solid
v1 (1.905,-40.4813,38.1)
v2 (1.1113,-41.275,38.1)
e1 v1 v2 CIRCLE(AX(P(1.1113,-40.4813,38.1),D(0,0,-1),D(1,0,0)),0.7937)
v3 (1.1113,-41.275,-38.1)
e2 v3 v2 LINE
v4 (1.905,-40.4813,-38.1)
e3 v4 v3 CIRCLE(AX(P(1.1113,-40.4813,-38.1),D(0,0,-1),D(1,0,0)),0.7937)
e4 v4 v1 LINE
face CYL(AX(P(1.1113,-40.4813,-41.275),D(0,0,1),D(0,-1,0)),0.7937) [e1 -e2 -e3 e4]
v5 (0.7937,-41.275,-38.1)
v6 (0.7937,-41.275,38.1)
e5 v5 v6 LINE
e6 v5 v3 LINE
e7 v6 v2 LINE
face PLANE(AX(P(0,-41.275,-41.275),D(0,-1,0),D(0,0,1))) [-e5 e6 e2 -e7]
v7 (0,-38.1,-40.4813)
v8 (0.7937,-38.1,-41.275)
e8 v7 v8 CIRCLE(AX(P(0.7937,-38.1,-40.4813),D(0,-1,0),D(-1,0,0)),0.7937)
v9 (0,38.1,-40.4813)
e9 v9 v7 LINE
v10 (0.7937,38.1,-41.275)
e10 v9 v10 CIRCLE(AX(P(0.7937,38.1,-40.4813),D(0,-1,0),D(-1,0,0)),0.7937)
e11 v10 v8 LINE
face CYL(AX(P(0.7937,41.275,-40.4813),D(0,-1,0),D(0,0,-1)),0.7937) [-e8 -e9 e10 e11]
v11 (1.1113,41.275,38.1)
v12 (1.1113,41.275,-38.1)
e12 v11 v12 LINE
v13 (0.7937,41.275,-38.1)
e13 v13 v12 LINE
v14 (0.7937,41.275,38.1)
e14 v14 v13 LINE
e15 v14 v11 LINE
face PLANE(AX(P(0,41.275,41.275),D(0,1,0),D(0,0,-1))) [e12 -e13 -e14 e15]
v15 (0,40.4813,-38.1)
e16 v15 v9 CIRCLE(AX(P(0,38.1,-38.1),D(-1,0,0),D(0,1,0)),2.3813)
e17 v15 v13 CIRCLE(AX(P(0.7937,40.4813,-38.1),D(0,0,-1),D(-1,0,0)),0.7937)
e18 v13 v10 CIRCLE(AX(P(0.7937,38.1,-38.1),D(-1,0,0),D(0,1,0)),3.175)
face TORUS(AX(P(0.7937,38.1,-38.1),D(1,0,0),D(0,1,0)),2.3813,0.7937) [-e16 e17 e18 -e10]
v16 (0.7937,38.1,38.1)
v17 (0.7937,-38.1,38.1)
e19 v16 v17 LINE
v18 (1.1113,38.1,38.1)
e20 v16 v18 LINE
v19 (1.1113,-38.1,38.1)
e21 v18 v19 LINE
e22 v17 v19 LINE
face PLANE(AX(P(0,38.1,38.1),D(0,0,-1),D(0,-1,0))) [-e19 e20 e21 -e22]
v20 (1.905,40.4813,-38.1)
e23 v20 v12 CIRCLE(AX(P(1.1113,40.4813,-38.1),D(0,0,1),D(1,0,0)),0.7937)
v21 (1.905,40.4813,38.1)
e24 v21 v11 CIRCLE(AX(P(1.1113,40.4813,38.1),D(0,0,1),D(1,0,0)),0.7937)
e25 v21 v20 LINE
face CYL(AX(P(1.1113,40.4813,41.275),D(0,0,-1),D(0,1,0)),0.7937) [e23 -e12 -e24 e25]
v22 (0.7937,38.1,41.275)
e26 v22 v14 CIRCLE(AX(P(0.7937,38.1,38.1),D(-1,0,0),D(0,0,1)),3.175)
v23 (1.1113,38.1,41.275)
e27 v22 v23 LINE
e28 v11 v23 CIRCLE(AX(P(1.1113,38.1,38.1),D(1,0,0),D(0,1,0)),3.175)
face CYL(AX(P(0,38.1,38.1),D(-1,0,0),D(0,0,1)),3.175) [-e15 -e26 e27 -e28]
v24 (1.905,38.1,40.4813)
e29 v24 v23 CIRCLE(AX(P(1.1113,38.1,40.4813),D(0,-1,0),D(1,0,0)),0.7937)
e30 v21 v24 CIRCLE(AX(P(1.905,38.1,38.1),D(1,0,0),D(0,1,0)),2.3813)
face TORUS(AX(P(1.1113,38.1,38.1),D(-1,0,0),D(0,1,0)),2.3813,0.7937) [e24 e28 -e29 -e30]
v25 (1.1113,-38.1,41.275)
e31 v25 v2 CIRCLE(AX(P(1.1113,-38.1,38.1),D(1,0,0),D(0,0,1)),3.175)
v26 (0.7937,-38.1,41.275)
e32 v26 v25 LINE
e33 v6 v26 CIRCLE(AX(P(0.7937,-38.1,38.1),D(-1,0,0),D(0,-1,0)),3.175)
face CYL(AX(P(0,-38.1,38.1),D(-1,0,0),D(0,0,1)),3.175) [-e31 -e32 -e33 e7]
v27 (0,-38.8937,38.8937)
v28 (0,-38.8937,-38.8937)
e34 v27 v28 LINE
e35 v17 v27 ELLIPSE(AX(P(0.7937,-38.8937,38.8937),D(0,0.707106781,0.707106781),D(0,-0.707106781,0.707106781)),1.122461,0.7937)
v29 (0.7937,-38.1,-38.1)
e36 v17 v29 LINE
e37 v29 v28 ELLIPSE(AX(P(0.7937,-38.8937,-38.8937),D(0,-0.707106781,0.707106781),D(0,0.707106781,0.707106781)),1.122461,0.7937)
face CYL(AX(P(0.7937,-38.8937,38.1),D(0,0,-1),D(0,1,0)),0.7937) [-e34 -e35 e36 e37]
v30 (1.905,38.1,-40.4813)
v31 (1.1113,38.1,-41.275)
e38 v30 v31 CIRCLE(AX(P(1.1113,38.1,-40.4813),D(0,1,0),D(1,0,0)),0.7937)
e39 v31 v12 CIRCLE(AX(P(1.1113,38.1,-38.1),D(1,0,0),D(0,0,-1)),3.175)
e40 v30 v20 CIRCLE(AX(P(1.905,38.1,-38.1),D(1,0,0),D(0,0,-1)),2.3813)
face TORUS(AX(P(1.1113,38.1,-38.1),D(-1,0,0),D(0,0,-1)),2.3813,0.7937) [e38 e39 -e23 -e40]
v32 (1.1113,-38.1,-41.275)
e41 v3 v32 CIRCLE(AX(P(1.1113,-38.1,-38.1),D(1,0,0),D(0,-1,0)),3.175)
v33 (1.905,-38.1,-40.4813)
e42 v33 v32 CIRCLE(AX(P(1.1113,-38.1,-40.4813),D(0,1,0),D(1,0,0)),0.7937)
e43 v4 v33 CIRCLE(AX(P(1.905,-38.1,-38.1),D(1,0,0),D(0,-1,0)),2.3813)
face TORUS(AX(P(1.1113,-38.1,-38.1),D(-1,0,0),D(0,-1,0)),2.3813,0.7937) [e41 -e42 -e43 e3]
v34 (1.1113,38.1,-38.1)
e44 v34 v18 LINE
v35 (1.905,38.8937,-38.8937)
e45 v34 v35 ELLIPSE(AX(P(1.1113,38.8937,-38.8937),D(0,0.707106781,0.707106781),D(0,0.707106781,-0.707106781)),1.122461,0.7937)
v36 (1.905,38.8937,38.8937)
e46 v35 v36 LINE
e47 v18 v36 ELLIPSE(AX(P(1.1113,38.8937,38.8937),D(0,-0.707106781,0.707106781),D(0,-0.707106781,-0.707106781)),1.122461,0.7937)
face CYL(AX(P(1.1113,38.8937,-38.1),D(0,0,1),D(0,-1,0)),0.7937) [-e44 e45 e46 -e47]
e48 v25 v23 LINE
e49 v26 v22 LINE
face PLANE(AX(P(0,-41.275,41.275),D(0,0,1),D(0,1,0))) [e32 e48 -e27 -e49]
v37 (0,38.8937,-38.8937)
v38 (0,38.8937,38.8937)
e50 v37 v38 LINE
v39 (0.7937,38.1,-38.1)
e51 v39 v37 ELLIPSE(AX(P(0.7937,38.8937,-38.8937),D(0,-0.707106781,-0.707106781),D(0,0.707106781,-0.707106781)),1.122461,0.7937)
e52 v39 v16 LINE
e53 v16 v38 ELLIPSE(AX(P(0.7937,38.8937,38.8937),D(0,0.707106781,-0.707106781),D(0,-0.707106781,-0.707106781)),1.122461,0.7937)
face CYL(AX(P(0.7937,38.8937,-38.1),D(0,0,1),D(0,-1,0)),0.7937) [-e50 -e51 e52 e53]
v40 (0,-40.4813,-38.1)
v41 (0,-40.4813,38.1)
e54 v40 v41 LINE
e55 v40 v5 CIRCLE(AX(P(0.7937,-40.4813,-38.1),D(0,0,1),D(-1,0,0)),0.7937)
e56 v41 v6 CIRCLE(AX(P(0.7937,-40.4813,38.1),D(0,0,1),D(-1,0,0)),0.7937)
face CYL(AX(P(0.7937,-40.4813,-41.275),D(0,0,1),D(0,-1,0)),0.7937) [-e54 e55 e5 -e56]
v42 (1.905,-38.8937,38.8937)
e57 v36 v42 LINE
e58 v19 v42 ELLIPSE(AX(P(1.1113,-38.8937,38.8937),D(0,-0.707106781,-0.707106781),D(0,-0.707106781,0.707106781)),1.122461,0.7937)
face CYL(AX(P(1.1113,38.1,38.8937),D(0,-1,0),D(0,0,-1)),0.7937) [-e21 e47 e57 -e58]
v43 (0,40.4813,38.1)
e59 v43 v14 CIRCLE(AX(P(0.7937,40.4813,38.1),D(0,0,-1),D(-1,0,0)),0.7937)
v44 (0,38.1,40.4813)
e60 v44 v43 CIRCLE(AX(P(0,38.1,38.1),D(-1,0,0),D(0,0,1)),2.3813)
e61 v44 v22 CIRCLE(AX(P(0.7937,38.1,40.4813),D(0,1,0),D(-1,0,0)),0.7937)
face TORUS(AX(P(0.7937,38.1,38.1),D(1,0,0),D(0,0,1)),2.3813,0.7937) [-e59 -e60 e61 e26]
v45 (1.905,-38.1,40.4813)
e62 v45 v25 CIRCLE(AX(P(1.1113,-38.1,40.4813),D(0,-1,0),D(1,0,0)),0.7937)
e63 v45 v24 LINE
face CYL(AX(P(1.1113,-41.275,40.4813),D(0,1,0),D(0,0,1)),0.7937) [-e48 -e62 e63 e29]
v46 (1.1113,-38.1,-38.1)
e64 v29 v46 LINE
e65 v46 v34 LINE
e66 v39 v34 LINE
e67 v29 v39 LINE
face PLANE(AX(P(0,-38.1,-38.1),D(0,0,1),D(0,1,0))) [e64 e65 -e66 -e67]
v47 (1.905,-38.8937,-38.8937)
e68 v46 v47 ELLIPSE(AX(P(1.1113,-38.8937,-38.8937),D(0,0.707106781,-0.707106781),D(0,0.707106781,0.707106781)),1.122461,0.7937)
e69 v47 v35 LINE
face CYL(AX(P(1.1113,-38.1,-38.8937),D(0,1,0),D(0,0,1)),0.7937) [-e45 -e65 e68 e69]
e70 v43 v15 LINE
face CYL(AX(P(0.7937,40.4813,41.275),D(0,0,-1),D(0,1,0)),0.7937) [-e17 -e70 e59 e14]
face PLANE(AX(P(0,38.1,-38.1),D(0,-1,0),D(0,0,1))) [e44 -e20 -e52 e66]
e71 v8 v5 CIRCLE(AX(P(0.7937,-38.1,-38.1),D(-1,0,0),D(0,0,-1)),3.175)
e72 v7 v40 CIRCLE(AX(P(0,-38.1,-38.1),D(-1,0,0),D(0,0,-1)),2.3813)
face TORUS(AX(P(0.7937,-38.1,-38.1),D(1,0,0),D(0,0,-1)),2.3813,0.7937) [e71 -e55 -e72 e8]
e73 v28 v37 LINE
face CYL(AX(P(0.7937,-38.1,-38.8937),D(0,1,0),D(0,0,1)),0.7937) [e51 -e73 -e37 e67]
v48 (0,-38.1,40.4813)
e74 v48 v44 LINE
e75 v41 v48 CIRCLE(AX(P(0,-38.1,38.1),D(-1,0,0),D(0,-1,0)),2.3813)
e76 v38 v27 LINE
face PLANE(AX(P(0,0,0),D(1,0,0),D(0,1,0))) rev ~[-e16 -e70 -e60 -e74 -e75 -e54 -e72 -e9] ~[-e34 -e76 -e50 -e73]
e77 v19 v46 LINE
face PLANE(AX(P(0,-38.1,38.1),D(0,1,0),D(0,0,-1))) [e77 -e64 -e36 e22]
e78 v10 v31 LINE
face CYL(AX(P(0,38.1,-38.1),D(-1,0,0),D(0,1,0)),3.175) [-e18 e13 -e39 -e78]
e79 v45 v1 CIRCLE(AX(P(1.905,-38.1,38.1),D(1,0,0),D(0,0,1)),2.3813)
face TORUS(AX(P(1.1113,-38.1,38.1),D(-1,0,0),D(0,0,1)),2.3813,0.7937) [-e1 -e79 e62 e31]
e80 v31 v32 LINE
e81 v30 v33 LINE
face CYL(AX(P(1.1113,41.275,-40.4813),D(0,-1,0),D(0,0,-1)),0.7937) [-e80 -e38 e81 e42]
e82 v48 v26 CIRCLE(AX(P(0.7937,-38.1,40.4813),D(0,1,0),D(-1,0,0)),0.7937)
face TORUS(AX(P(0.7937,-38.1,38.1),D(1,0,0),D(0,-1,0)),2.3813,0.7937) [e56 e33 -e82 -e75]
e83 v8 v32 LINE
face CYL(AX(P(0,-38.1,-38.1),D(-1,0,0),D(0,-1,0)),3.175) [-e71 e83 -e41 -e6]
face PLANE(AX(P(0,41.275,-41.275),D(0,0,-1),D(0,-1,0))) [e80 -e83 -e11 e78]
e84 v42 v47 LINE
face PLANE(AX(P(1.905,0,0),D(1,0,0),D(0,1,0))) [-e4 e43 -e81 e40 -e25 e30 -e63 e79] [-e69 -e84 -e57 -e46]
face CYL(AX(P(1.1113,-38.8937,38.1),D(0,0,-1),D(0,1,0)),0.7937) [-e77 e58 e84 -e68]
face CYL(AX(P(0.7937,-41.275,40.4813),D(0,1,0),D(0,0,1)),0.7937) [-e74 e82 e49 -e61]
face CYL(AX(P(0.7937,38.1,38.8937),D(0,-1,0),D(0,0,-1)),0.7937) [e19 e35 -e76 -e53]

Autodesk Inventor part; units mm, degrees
ref_plane "YZ Plane" through (0, 0, 0) normal (1, 0, 0) x (0, 1, 0)
ref_plane "XZ Plane" through (0, 0, 0) normal (0, 1, 0) x (-1, 0, 0)
ref_plane "XY Plane" through (0, 0, 0) normal (0, 0, 1) x (1, 0, 0)
sketch "Sketch1" plane through (0, 0, 0) normal (1, 0, 0) x (0, 1, 0)
  line L0 (-38.1, -38.1) -> (38.1, -38.1)
  line L1 (38.1, -38.1) -> (38.1, 38.1)
  line L2 (38.1, 38.1) -> (-38.1, 38.1)
  line L3 (-38.1, 38.1) -> (-38.1, -38.1)
  line L4 (-38.1, -38.1) -> (38.1, 38.1) construction
  line L5 (38.1, -38.1) -> (-38.1, 38.1) construction
  line L6 (-41.275, 41.275) -> (41.275, 41.275)
  line L7 (41.275, 41.275) -> (41.275, -41.275)
  line L8 (41.275, -41.275) -> (-41.275, -41.275)
  line L9 (-41.275, -41.275) -> (-41.275, 41.275)
  point P0 (0, 0)
  dimension "d0" = 76.2
  dimension "d1" = 76.2
  dimension "d2" = 3.175
extrude "Extrusion1" add sketch "Sketch1" along normal blind 1.905
fillet "Fillet1" radius 0.7937 16 edges at (1.905, 0, 41.275) (0, 0, 41.275) (1.905, 0, 38.1) (0, 0, 38.1) (1.905, 0, -38.1) (0, 0, -38.1) (1.905, 0, -41.275) (0, 0, -41.275) (1.905, -38.1, 0) (0, -38.1, 0) (1.905, 38.1, 0) (1.905, 41.275, 0) (0, 38.1, 0) (0, 41.275, 0) (1.905, -41.275, 0) (0, -41.275, 0)
fillet "Fillet2" radius 3.175 12 edges at (0.9525, 41.275, 41.275) (0.2325, 41.0425, 41.0425) (1.6725, 41.0425, 41.0425) (0.9525, -41.275, 41.275) (0.2325, -41.0425, 41.0425) (1.6725, -41.0425, 41.0425) (0.9525, -41.275, -41.275) (0.2325, -41.0425, -41.0425) (1.6725, -41.0425, -41.0425) (0.9525, 41.275, -41.275) (0.2325, 41.0425, -41.0425) (1.6725, 41.0425, -41.0425)
equation "\"d0\" = 0.25 * sensorHolderFlushORingID"
equation "\"d1\" = 0.25 * sensorHolderFlushORingID"
equation "\"d2\" = oRingWidth"
equation "\"d5\" = 0.25 * oRingWidth"
equation "\"d6\" = oRingWidth"
equation "\"acrylicThickness\" = 6.35"
equation "\"height\" = 101.6"
equation "\"width\" = 101.6"
equation "\"depth\" = 101.6"
equation "\"mirrorAngle\" = 5deg"
equation "\"detectorWidth\" = 52"
equation "\"detectorHeight\" = 52"
equation "\"mirrorThickness\" = 3"
equation "\"fresnelThickness\" = 0.1"
equation "\"focalLength\" = 76.2"
equation "\"ior\" = 1.49"
equation "\"centerThickness\" = 1.524"
equation "\"fresnelAngle\" = 90deg"
equation "\"fresnelEffectiveDiameter\" = 76.2"
equation "\"mirrorSuppourtWidth\" = 38.1"
equation "\"backGrooveBit\" = 4.8006"
equation "\"sensorHolderWidth\" = 88.9"
equation "\"sensorHolderHeight\" = 88.9"
equation "\"sensorHolderSensorHeight\" = 53.975"
equation "\"sensorHolderSensorWidth\" = 53.975"
equation "\"sensorHolderORing\" = 3.175"
equation "\"sensorHolderFlushORing\" = 3.175"
equation "\"sensorHolderFlushORingID\" = 304.8"
equation "\"frontBackORingID\" = 419.1"
equation "\"oRingWidth\" = 3.175"
equation "\"sensorHolderORingID\" = 203.2"
equation "\"topBottomHorizontalMirrorGroove\" = 12.7"
equation "\"backMirrorGroove\" = 6.35"
equation "\"mirrorGroove\" = 19.05"
equation "\"mirrorGrooveFillet\" = 6.35"
equation "\"fresnelChamfer\" = 6.35"
equation "\"mirrorGrooveDrill\" = 6.35"
equation "\"mirrorGrooveMill\" = 3.175"
equation "\"fresnelMirrorChamfer\" = 6.35"
equation "\"detectorOpeningWidth\" = 76.2"
equation "\"detectorOpeningHeight\" = 76.2"
properties part number "sesnorHolderFlushORing" material "Rubber"
